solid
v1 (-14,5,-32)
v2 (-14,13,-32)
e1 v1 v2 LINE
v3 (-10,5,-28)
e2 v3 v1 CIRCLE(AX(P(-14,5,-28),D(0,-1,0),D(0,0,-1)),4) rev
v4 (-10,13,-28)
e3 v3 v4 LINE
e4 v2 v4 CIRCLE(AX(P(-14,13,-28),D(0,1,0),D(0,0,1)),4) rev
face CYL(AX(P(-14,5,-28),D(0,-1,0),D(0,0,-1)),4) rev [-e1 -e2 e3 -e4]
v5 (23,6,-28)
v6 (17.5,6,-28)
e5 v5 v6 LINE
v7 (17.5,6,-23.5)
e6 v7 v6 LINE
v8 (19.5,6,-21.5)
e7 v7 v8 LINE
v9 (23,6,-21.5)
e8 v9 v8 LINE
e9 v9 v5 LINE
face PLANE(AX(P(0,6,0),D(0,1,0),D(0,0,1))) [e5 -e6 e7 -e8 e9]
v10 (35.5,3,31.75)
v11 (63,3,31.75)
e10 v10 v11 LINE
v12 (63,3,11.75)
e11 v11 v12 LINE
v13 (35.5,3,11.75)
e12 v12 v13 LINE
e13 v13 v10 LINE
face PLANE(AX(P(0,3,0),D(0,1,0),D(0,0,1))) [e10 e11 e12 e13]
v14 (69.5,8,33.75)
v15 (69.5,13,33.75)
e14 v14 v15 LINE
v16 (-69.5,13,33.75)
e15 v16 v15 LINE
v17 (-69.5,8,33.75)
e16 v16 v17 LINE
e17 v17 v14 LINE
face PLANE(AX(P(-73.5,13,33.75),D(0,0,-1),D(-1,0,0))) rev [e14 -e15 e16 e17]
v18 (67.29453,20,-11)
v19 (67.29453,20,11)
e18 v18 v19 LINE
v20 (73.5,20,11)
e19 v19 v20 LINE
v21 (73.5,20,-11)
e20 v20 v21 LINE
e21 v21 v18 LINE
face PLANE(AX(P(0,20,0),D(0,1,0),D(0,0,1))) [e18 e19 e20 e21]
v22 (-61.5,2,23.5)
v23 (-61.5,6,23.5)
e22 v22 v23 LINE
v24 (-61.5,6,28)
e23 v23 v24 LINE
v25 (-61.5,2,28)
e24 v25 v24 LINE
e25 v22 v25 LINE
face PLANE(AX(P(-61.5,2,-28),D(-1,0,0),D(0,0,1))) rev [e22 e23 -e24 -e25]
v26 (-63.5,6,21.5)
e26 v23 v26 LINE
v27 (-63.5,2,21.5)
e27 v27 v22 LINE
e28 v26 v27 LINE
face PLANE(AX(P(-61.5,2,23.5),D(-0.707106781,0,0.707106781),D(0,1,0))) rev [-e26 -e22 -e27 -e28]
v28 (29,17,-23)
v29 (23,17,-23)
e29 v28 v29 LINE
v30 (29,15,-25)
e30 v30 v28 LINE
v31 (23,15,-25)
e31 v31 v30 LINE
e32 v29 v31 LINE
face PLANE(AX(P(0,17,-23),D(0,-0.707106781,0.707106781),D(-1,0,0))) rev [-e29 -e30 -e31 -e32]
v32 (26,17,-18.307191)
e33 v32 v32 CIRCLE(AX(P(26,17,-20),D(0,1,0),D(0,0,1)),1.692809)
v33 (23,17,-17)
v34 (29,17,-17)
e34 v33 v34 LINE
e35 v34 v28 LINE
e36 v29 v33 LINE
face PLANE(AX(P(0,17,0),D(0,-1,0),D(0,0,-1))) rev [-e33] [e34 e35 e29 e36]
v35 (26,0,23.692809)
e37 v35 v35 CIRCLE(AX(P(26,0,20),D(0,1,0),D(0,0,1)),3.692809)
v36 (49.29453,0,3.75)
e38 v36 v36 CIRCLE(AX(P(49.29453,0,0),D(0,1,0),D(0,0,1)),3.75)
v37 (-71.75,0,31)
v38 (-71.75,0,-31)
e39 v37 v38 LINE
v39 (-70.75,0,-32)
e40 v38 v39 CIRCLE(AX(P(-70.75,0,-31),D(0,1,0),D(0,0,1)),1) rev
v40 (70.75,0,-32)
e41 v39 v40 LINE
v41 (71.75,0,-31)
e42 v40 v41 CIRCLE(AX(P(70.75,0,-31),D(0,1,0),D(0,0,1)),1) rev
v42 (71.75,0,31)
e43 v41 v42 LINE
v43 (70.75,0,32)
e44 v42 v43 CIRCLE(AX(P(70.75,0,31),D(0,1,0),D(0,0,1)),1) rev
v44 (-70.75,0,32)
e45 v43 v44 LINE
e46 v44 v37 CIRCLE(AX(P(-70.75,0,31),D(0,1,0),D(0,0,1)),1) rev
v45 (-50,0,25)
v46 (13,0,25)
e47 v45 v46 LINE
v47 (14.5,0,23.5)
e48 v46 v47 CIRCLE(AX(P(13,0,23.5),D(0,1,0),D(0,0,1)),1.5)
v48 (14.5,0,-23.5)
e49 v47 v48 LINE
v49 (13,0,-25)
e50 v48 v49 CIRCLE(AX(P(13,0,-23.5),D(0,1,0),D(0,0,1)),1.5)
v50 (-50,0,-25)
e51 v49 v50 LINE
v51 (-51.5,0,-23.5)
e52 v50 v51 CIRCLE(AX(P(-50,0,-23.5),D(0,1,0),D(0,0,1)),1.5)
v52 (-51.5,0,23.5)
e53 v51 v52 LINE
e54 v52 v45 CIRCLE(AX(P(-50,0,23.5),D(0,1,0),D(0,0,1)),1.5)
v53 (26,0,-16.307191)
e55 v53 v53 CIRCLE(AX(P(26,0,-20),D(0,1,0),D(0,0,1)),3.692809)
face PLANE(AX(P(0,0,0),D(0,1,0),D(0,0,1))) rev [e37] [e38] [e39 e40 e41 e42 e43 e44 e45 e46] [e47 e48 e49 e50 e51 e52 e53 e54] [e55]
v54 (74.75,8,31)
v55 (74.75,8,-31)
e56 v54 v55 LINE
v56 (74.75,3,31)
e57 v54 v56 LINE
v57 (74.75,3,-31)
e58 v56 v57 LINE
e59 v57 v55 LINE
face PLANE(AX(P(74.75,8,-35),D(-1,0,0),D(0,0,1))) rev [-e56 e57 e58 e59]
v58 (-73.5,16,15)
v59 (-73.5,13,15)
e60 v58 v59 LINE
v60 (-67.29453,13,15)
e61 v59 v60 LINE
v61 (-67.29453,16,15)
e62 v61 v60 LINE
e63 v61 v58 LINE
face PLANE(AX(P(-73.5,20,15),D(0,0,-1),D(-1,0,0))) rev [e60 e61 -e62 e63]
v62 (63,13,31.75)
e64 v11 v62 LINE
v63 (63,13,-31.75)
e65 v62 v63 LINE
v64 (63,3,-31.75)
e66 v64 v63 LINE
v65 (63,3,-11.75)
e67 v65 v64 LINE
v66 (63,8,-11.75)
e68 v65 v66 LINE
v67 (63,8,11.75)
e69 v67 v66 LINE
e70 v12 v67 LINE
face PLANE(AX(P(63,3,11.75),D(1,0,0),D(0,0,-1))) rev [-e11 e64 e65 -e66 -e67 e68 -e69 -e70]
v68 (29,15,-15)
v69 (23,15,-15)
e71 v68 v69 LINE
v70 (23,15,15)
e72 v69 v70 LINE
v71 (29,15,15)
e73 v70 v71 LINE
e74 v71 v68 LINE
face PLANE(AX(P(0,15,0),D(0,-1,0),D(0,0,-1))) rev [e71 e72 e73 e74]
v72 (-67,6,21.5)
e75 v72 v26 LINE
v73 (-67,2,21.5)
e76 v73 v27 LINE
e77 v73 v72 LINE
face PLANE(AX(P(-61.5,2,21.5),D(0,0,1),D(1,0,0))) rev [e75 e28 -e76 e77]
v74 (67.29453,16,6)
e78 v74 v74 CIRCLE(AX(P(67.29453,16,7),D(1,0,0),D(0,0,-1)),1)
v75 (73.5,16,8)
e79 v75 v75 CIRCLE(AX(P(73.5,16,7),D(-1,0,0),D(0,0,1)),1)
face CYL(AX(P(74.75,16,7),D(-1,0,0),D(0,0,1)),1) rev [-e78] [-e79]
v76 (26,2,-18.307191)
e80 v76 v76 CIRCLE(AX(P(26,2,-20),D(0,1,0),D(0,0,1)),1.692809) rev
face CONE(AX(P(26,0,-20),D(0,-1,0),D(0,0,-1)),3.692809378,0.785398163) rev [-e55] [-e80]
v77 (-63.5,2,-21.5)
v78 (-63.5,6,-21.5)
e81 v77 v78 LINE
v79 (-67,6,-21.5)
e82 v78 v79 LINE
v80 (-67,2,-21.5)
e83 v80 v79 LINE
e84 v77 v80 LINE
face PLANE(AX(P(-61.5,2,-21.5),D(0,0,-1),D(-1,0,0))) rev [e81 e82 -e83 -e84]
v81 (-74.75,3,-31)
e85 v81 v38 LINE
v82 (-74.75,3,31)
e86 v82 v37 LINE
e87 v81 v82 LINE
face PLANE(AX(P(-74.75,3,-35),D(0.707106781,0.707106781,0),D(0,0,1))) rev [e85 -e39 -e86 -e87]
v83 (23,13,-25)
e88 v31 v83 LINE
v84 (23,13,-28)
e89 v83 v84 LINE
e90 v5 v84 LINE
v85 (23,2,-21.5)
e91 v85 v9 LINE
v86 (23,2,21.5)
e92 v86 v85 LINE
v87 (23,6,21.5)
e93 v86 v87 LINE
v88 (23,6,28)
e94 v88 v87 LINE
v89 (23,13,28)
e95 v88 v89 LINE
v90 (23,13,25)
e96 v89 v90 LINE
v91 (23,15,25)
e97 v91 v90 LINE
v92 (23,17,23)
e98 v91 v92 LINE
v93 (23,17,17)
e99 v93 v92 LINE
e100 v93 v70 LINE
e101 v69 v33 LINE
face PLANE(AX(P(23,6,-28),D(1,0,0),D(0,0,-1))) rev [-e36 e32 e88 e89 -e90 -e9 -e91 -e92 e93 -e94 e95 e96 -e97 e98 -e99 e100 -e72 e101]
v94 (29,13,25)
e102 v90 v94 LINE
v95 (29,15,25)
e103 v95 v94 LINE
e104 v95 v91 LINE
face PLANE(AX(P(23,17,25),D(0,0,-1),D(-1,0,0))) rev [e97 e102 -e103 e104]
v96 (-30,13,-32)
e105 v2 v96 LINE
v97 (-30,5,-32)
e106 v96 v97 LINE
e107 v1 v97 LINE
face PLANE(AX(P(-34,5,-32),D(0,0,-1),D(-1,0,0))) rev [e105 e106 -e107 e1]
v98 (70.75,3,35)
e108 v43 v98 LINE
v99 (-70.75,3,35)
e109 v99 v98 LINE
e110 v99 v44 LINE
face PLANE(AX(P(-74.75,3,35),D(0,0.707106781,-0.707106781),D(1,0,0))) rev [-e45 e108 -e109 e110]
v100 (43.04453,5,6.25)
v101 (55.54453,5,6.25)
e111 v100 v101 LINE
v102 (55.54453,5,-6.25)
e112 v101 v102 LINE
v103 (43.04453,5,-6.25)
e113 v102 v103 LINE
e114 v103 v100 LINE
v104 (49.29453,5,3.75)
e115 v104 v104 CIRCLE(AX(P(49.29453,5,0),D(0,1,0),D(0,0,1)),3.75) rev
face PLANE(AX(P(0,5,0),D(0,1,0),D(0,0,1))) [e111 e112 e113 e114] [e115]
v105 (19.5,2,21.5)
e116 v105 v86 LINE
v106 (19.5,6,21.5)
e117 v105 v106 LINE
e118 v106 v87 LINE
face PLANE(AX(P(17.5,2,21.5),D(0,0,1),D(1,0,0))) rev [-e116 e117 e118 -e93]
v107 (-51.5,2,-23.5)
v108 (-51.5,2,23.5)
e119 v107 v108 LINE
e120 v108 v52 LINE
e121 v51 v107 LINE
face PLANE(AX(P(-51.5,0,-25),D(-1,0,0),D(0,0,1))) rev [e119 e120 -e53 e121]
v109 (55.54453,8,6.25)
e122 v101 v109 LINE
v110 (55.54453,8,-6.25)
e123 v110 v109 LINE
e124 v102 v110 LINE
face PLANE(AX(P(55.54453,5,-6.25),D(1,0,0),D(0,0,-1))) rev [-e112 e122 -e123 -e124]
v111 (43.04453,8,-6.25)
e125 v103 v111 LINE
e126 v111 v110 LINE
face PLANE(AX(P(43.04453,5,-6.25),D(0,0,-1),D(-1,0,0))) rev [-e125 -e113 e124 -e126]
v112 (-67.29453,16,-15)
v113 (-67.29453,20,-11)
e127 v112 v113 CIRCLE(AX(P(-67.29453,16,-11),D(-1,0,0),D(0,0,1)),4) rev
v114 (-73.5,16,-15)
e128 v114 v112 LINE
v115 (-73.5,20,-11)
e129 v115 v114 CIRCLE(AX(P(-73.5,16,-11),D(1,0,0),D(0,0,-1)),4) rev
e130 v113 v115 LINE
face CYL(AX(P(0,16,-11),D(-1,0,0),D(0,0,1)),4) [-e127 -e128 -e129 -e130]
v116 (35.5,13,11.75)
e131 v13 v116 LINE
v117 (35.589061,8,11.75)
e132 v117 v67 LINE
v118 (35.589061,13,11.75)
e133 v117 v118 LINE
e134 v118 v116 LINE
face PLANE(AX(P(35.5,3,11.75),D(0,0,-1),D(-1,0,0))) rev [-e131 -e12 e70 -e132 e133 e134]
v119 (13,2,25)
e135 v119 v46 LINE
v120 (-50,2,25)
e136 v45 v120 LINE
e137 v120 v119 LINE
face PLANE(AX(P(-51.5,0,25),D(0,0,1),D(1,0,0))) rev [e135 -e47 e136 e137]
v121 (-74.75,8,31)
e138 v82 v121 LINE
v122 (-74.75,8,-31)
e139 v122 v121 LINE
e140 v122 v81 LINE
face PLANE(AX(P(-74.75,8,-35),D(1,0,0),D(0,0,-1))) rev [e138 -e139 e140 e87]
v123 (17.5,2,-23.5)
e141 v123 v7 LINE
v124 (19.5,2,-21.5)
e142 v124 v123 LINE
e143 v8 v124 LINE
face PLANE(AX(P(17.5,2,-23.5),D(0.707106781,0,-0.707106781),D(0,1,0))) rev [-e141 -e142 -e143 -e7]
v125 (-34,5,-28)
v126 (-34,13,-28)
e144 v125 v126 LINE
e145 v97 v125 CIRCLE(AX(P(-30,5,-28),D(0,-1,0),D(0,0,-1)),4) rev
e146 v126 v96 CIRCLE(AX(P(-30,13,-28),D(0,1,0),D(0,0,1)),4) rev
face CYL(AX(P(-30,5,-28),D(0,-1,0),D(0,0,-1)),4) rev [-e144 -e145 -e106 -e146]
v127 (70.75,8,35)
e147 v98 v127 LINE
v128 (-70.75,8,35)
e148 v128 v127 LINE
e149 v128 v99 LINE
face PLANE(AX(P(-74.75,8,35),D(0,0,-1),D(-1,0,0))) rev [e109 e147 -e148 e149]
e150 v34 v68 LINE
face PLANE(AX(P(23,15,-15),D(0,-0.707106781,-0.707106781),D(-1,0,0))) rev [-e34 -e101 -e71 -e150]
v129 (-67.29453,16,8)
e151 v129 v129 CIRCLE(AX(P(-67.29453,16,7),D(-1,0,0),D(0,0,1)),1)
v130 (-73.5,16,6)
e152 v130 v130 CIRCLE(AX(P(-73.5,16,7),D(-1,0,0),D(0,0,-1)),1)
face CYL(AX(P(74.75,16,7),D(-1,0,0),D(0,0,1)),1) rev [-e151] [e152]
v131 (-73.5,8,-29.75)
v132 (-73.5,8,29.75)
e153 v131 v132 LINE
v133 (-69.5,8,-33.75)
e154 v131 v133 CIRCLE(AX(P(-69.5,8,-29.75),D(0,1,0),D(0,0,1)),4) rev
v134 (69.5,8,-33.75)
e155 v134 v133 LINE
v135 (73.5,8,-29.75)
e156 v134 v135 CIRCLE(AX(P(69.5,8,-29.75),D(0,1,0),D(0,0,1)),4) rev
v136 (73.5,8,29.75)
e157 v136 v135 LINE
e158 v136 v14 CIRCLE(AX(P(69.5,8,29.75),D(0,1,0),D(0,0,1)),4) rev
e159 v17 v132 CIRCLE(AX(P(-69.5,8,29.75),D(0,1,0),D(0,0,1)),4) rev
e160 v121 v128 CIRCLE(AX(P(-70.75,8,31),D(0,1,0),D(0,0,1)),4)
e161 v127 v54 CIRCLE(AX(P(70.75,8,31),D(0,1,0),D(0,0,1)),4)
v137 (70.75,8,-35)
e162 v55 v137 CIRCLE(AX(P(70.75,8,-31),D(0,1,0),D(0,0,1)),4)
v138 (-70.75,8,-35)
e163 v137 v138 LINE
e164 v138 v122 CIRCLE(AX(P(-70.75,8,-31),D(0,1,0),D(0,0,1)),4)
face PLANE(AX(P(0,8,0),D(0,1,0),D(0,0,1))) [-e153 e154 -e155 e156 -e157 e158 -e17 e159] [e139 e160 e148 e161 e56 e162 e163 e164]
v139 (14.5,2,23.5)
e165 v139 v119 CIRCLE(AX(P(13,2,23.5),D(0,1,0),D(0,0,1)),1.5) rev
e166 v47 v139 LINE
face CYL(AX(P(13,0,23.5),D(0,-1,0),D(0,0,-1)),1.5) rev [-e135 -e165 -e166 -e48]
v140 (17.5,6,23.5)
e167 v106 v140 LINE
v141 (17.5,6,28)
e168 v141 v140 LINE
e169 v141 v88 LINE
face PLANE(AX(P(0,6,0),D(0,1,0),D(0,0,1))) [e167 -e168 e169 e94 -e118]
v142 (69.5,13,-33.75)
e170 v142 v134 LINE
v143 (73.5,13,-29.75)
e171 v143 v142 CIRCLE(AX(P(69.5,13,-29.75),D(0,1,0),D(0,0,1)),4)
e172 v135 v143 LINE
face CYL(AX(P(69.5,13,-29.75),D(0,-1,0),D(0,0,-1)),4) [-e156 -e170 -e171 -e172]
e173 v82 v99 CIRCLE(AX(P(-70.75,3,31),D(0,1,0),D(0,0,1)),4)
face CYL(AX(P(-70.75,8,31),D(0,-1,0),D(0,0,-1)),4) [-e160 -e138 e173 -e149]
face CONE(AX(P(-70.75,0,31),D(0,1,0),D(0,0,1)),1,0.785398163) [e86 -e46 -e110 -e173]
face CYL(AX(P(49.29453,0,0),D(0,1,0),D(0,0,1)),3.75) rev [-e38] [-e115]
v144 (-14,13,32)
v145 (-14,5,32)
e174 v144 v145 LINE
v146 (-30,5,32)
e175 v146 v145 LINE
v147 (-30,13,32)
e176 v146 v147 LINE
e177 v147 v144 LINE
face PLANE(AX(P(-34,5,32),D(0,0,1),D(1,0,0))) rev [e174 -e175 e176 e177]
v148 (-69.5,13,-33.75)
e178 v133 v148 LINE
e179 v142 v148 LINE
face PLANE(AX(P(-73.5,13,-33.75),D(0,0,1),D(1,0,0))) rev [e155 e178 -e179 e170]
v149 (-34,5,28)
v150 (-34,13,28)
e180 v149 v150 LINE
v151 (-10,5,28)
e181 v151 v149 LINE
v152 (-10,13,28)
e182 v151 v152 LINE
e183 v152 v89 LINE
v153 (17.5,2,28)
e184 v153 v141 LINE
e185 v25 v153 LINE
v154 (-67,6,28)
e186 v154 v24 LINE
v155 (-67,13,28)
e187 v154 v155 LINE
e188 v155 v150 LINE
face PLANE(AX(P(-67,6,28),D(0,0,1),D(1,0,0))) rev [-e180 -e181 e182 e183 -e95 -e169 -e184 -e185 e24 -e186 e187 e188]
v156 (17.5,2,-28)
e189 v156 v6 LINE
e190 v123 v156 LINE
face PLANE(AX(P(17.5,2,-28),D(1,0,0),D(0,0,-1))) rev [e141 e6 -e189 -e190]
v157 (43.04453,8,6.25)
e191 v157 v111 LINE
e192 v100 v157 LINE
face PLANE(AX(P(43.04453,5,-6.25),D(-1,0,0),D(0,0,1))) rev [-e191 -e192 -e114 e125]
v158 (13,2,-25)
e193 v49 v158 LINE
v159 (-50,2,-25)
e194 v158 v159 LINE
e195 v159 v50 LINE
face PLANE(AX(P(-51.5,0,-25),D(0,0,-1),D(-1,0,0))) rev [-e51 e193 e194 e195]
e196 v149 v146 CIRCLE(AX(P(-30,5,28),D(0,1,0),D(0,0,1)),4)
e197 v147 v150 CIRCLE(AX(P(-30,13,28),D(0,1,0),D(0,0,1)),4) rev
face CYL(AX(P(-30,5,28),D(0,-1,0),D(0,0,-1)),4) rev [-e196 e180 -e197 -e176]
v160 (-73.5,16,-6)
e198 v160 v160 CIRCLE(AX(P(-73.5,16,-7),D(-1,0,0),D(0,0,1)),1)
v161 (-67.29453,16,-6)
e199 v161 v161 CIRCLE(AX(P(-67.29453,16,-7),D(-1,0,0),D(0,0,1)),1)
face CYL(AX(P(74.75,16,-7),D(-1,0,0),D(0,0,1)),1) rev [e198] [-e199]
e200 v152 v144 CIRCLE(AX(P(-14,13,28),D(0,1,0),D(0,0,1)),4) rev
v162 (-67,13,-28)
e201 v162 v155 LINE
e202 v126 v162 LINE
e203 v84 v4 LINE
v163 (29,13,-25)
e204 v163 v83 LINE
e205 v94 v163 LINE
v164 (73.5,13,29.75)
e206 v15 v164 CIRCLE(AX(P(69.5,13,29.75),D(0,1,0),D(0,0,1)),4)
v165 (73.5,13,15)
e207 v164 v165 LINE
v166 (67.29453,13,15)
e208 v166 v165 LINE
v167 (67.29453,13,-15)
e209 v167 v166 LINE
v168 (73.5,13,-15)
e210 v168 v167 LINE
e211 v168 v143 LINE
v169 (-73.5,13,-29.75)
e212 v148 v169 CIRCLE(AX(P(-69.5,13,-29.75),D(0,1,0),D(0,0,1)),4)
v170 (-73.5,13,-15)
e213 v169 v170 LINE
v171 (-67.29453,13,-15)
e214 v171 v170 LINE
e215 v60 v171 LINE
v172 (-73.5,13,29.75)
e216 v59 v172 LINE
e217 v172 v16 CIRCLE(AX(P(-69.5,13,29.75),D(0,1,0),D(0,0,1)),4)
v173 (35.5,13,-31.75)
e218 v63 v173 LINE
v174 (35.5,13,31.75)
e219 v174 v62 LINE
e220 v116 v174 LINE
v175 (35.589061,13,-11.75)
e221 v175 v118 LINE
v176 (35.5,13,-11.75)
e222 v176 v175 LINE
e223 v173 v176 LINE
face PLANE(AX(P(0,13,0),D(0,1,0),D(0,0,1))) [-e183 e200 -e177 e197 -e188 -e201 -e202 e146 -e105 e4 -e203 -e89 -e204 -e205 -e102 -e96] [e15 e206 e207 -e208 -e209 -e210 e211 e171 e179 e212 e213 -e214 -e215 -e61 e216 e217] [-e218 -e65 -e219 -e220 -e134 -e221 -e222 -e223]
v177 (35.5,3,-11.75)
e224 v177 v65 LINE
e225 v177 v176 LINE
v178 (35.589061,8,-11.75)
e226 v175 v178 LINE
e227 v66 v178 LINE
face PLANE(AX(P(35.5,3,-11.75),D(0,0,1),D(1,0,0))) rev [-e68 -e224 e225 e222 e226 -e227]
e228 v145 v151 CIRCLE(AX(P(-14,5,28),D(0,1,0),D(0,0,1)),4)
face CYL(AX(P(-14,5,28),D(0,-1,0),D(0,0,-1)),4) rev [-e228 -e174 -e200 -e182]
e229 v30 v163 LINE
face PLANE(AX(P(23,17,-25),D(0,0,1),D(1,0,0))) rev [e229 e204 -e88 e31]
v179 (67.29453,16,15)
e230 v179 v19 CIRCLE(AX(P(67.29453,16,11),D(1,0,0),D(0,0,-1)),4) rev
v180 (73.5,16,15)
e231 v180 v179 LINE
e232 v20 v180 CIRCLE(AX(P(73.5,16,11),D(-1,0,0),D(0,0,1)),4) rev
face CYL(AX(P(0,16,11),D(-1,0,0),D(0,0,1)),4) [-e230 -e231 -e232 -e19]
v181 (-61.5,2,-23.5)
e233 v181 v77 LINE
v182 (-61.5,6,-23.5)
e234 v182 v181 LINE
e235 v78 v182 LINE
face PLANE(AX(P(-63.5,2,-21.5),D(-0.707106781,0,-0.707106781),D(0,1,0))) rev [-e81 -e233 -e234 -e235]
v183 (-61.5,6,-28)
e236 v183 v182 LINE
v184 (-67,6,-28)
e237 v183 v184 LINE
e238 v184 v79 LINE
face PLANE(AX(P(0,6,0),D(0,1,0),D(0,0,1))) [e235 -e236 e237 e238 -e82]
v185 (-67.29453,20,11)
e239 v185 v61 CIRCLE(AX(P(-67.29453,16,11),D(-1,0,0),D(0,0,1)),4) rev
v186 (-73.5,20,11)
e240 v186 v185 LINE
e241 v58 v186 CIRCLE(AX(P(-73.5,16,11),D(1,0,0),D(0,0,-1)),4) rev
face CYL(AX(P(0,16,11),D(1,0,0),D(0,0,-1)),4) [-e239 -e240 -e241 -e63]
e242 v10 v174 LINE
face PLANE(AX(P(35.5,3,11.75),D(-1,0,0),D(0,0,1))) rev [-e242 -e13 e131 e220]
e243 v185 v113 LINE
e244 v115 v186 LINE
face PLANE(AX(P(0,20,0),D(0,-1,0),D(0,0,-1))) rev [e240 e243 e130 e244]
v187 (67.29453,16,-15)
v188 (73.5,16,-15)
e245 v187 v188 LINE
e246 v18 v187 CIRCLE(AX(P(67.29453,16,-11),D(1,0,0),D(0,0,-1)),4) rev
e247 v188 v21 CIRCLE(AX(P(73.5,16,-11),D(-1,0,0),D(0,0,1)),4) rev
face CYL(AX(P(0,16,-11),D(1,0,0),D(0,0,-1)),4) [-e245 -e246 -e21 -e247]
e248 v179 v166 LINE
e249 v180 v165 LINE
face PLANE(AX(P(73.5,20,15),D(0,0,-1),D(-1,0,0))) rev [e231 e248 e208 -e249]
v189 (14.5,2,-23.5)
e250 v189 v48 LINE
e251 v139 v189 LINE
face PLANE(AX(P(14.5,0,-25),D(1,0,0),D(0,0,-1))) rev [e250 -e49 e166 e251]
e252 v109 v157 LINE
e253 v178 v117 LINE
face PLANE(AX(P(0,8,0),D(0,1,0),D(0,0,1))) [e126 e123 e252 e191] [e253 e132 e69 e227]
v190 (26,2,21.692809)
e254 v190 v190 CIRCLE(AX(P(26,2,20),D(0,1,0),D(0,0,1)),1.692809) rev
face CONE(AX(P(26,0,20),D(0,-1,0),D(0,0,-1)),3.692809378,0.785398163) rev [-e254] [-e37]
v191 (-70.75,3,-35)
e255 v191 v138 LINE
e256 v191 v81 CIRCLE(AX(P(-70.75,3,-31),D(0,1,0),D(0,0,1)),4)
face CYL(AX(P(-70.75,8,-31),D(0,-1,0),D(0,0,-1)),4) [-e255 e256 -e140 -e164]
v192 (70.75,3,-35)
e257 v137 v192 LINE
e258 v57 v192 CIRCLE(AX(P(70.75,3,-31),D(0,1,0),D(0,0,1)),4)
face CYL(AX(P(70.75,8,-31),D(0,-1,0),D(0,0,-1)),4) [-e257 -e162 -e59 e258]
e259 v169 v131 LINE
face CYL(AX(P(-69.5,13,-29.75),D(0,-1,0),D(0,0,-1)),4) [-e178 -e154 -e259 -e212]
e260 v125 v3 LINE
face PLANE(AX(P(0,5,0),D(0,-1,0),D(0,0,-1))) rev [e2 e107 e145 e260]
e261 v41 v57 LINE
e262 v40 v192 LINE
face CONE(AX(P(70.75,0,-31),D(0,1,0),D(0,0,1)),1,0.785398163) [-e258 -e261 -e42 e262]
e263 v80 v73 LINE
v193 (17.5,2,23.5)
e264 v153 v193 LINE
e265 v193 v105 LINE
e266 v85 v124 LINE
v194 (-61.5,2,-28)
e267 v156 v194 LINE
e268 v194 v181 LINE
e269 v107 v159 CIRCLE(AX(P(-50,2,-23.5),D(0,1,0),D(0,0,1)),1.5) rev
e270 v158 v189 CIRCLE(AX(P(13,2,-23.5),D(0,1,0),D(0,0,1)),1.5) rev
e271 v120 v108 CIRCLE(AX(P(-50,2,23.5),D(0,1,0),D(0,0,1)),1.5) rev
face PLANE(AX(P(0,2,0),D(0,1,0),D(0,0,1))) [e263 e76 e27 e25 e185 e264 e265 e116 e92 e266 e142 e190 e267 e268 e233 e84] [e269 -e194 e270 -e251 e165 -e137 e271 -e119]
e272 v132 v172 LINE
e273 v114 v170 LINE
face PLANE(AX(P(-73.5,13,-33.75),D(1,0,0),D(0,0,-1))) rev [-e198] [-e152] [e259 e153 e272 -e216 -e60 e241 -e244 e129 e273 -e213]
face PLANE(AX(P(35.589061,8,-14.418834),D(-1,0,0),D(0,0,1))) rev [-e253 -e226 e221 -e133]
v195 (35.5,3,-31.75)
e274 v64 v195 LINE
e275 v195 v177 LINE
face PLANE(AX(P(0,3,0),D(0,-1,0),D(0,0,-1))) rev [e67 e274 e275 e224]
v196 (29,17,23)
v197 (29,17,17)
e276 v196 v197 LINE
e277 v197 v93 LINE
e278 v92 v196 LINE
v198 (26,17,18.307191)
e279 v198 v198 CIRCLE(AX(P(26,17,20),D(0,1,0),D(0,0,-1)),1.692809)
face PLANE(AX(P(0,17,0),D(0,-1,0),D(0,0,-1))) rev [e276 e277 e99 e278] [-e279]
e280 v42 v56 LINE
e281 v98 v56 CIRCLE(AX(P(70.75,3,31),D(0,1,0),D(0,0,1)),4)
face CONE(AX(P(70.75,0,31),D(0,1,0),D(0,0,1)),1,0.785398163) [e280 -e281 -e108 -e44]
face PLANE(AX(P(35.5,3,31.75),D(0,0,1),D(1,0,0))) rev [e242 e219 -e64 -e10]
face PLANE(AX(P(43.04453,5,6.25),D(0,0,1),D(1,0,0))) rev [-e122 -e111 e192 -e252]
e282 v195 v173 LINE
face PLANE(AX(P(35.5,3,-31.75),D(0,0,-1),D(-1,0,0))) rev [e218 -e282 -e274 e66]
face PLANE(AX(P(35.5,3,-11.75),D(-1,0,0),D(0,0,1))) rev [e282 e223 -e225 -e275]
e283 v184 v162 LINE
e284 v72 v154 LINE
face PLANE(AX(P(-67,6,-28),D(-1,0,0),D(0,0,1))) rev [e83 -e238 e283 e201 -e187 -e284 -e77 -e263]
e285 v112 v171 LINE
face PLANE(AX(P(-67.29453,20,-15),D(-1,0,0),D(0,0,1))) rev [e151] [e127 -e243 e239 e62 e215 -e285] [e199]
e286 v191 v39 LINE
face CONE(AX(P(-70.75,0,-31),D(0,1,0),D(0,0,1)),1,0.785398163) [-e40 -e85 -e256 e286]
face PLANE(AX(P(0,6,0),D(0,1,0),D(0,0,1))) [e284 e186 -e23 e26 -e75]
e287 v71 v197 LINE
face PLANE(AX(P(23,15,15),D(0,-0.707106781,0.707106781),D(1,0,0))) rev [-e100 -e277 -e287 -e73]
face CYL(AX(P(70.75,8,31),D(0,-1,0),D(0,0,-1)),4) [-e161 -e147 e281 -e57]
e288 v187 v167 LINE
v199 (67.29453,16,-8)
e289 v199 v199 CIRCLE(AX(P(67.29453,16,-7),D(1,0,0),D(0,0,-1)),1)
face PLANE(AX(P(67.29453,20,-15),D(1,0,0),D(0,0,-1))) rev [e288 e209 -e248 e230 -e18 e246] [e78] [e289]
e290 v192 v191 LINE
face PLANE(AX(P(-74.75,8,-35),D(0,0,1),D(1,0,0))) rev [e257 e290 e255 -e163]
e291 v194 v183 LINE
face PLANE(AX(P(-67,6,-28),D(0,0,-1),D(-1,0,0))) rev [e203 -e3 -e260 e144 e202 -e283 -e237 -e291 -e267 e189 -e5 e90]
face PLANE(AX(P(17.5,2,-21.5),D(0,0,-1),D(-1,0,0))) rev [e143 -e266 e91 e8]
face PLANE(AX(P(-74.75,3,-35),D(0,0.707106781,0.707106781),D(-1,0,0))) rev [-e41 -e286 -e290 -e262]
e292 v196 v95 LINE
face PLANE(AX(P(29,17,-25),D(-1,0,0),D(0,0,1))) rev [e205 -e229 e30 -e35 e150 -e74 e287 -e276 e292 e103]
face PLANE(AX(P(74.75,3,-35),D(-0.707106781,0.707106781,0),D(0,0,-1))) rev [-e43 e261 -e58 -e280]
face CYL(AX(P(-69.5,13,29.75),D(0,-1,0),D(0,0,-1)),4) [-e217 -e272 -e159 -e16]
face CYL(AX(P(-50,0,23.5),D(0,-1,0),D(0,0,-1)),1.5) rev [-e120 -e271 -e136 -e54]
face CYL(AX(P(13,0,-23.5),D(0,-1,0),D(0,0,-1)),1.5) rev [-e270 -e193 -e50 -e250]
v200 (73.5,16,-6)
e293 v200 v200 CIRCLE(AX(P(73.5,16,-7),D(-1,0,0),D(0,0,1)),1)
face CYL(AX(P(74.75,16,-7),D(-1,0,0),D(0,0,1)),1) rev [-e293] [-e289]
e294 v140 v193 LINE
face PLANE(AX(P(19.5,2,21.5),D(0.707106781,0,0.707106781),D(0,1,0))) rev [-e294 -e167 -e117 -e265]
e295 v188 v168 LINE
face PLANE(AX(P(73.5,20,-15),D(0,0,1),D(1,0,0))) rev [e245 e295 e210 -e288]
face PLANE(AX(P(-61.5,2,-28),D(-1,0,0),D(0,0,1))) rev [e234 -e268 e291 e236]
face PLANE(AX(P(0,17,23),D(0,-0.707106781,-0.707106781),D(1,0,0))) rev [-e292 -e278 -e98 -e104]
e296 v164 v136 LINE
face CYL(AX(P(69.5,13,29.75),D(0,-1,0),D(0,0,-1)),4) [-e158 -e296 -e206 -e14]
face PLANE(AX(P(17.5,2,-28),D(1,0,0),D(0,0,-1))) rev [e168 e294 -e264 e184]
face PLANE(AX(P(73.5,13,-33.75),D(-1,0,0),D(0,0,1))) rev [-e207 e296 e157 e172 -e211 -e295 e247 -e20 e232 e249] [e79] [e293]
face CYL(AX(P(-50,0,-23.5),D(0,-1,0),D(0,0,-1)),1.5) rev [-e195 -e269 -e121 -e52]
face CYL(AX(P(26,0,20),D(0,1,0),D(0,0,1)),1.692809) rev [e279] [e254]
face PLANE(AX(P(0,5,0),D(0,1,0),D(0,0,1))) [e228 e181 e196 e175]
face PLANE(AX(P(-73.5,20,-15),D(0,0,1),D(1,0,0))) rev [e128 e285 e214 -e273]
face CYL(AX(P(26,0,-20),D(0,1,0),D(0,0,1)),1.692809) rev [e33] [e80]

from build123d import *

# Parameters (mm, degrees)
SKETCH1_W           = 149.5
SKETCH1_H           = 70
BOSS_EXTRUDE1_DEPTH = 8
FILLET1_R           = 4
SKETCH6_W           = 147
SKETCH6_H           = 67.5
BOSS_EXTRUDE3_DEPTH = 5
FILLET2_R           = 4
SKETCH7_W           = 6.205469591
SKETCH7_H           = 30
BOSS_EXTRUDE4_DEPTH = 7
SKETCH8_R           = 1
CUT_EXTRUDE3_DEPTH  = 154.632882223
FILLET5_R           = 4
SKETCH9_W           = 90
SKETCH9_H           = 56
CUT_EXTRUDE4_DEPTH  = 7
SKETCH10_W          = 79
SKETCH10_H          = 56
CUT_EXTRUDE5_DEPTH  = 4
SKETCH11_W          = 66
SKETCH11_H          = 50
CUT_EXTRUDE6_DEPTH  = 85.478177656
SKETCH13_W          = 6
SKETCH13_H          = 50
BOSS_EXTRUDE5_DEPTH = 4
SKETCH14_R          = 1.692809378
CUT_EXTRUDE7_DEPTH  = 85.270768953
SKETCH15_W          = 6
SKETCH15_H          = 30
CUT_EXTRUDE8_DEPTH  = 2
CHAMFER2_SIZE       = 2
SKETCH16_R          = 3.75
CUT_EXTRUDE9_DEPTH  = 84.555744865
SKETCH17_W          = 12.5
SKETCH17_H          = 12.5
CUT_EXTRUDE10_DEPTH = 8
SKETCH20_W          = 24
SKETCH20_H          = 4
CUT_EXTRUDE12_DEPTH = 8
FILLET6_R           = 4
CHAMFER3_SIZE       = 2
SKETCH23_W          = 5.5
SKETCH23_H          = 43
CUT_EXTRUDE15_DEPTH = 4
FILLET7_R           = 1.5
CHAMFER6_SIZE       = 2
SKETCH26_W          = 27.5
SKETCH26_H          = 20
CUT_EXTRUDE16_DEPTH = 10
SKETCH27_W          = 27.410939183
SKETCH27_H          = 28.83766823
CUT_EXTRUDE17_DEPTH = 5
CHAMFER7_SIZE       = 3


with BuildPart() as part:
    # Sketch1 → Boss-Extrude1 (new body)
    with BuildSketch(Plane(origin=(0, 0, 0), x_dir=(1, 0, 0), z_dir=(0, 1, 0))):
        Rectangle(SKETCH1_W, SKETCH1_H)
    extrude(amount=BOSS_EXTRUDE1_DEPTH)

    # Fillet1
    fillet1_edges = [part.edges().sort_by_distance(p)[0] for p in [
        (74.75, 4, 35),
        (-74.75, 4, 35),
        (-74.75, 4, -35),
        (74.75, 4, -35),
    ]]
    fillet(fillet1_edges, radius=FILLET1_R)

    # Sketch6 → Boss-Extrude3 (add)
    with BuildSketch(Plane(origin=(0, 8, 0), x_dir=(1, 0, 0), z_dir=(0, 1, 0))):
        Rectangle(SKETCH6_W, SKETCH6_H)
    extrude(amount=BOSS_EXTRUDE3_DEPTH)

    # Fillet2
    fillet2_edges = [part.edges().sort_by_distance(p)[0] for p in [
        (73.5, 10.5, 33.75),
        (73.5, 10.5, -33.75),
        (-73.5, 10.5, -33.75),
        (-73.5, 10.5, 33.75),
    ]]
    fillet(fillet2_edges, radius=FILLET2_R)

    # Sketch7 → Boss-Extrude4 (add)
    with BuildSketch(Plane(origin=(0, 13, 0), x_dir=(1, 0, 0), z_dir=(0, 1, 0))):
        with Locations((-70.397265205, 0)):
            Rectangle(SKETCH7_W, SKETCH7_H)
        with Locations((70.397265205, 0)):
            Rectangle(SKETCH7_W, SKETCH7_H)
    extrude(amount=BOSS_EXTRUDE4_DEPTH)

    # Sketch8 → Cut-Extrude3 (cut, through all)
    with BuildSketch(Plane.ZY.offset(73.5)):
        with Locations((-7, 16)):
            Circle(SKETCH8_R)
        with Locations((7, 16)):
            Circle(SKETCH8_R)
    extrude(amount=-CUT_EXTRUDE3_DEPTH, mode=Mode.SUBTRACT)

    # Fillet5
    fillet5_edges = [part.edges().sort_by_distance(p)[0] for p in [
        (-70.397265204, 20, 15),
        (-70.397265204, 20, -15),
        (70.397265204, 20, -15),
        (70.397265204, 20, 15),
    ]]
    fillet(fillet5_edges, radius=FILLET5_R)

    # Sketch9 → Cut-Extrude4 (cut)
    with BuildSketch(Plane(origin=(0, 13, 0), x_dir=(1, 0, 0), z_dir=(0, 1, 0))):
        with Locations((-22, 0)):
            Rectangle(SKETCH9_W, SKETCH9_H)
    extrude(amount=-CUT_EXTRUDE4_DEPTH, mode=Mode.SUBTRACT)

    # Sketch10 → Cut-Extrude5 (cut)
    with BuildSketch(Plane(origin=(0, 6, 0), x_dir=(1, 0, 0), z_dir=(0, 1, 0))):
        with Locations((-22, 0)):
            Rectangle(SKETCH10_W, SKETCH10_H)
    extrude(amount=-CUT_EXTRUDE5_DEPTH, mode=Mode.SUBTRACT)

    # Sketch11 → Cut-Extrude6 (cut, through all)
    with BuildSketch(Plane(origin=(0, 2, 0), x_dir=(1, 0, 0), z_dir=(0, 1, 0))):
        with Locations((-18.5, 0)):
            Rectangle(SKETCH11_W, SKETCH11_H)
    extrude(amount=-CUT_EXTRUDE6_DEPTH, mode=Mode.SUBTRACT)

    # Sketch13 → Boss-Extrude5 (add)
    with BuildSketch(Plane(origin=(0, 13, 0), x_dir=(1, 0, 0), z_dir=(0, 1, 0))):
        with Locations((26, 0)):
            Rectangle(SKETCH13_W, SKETCH13_H)
    extrude(amount=BOSS_EXTRUDE5_DEPTH)

    # Sketch14 → Cut-Extrude7 (cut, through all)
    with BuildSketch(Plane(origin=(0, 17, 0), x_dir=(1, 0, 0), z_dir=(0, 1, 0))):
        with Locations(Location((26, 20, 0), (0, 0, 270))):
            Circle(SKETCH14_R)
        with Locations(Location((26, -20, 0), (0, 0, 90))):
            Circle(SKETCH14_R)
    extrude(amount=-CUT_EXTRUDE7_DEPTH, mode=Mode.SUBTRACT)

    # Sketch15 → Cut-Extrude8 (cut)
    with BuildSketch(Plane(origin=(0, 17, 0), x_dir=(1, 0, 0), z_dir=(0, 1, 0))):
        with Locations((26, 0)):
            Rectangle(SKETCH15_W, SKETCH15_H)
    extrude(amount=-CUT_EXTRUDE8_DEPTH, mode=Mode.SUBTRACT)

    # Chamfer2
    chamfer2_edges = [part.edges().sort_by_distance(p)[0] for p in [
        (26, 0, -21.692809378),
        (26, 0, 21.692809378),
    ]]
    chamfer(chamfer2_edges, length=CHAMFER2_SIZE)

    # Sketch16 → Cut-Extrude9 (cut, through all)
    with BuildSketch(Plane(origin=(0, 13, 0), x_dir=(1, 0, 0), z_dir=(0, 1, 0))):
        with Locations(Location((49.294530409, 0, 0), (0, 0, 270))):
            Circle(SKETCH16_R)
    extrude(amount=-CUT_EXTRUDE9_DEPTH, mode=Mode.SUBTRACT)

    # Sketch17 → Cut-Extrude10 (cut)
    with BuildSketch(Plane(origin=(0, 13, 0), x_dir=(1, 0, 0), z_dir=(0, 1, 0))):
        with Locations((49.294530409, 0)):
            Rectangle(SKETCH17_W, SKETCH17_H)
    extrude(amount=-CUT_EXTRUDE10_DEPTH, mode=Mode.SUBTRACT)

    # Sketch20 → Cut-Extrude12 (cut)
    with BuildSketch(Plane(origin=(0, 13, 0), x_dir=(1, 0, 0), z_dir=(0, 1, 0))):
        with Locations((-22, 30)):
            Rectangle(SKETCH20_W, SKETCH20_H)
        with Locations((-22, -30)):
            Rectangle(SKETCH20_W, SKETCH20_H)
    extrude(amount=-CUT_EXTRUDE12_DEPTH, mode=Mode.SUBTRACT)

    # Fillet6
    fillet6_edges = [part.edges().sort_by_distance(p)[0] for p in [
        (-34, 9, 32),
        (-10, 9, 32),
        (-10, 9, -32),
        (-34, 9, -32),
    ]]
    fillet(fillet6_edges, radius=FILLET6_R - 0.0001)  # a hair under: the kernel refuses the full size

    # Chamfer3
    chamfer3_edges = [part.edges().sort_by_distance(p)[0] for p in [
        (26, 17, 15),
        (26, 17, -15),
        (26, 17, -25),
        (26, 17, 25),
    ]]
    chamfer(chamfer3_edges, length=CHAMFER3_SIZE - 0.0001)  # a hair under: the kernel refuses the full size

    # Sketch23 → Cut-Extrude15 (cut)
    with BuildSketch(Plane(origin=(0, 6, 0), x_dir=(1, 0, 0), z_dir=(0, 1, 0))):
        with Locations((-64.25, 0)):
            Rectangle(SKETCH23_W, SKETCH23_H)
        with Locations((20.25, 0)):
            Rectangle(SKETCH23_W, SKETCH23_H)
    extrude(amount=-CUT_EXTRUDE15_DEPTH, mode=Mode.SUBTRACT)

    # Fillet7
    fillet7_edges = [part.edges().sort_by_distance(p)[0] for p in [
        (14.5, 1, -25),
        (14.5, 1, 25),
        (-51.5, 1, 25),
        (-51.5, 1, -25),
    ]]
    fillet(fillet7_edges, radius=FILLET7_R)

    # Chamfer6
    chamfer6_edges = [part.edges().sort_by_distance(p)[0] for p in [
        (-61.5, 4, 21.5),
        (-61.5, 4, -21.5),
        (17.5, 4, 21.5),
        (17.5, 4, -21.5),
    ]]
    chamfer(chamfer6_edges, length=CHAMFER6_SIZE)

    # Sketch26 → Cut-Extrude16 (cut)
    with BuildSketch(Plane(origin=(0, 13, 0), x_dir=(1, 0, 0), z_dir=(0, 1, 0))):
        with Locations((49.25, -21.75)):
            Rectangle(SKETCH26_W, SKETCH26_H)
        with Locations((49.25, 21.75)):
            Rectangle(SKETCH26_W, SKETCH26_H)
    extrude(amount=-CUT_EXTRUDE16_DEPTH, mode=Mode.SUBTRACT)

    # Sketch27 → Cut-Extrude17 (cut)
    with BuildSketch(Plane(origin=(0, 13, 0), x_dir=(1, 0, 0), z_dir=(0, 1, 0))):
        with Locations((49.294530409, 0)):
            Rectangle(SKETCH27_W, SKETCH27_H)
    extrude(amount=-CUT_EXTRUDE17_DEPTH, mode=Mode.SUBTRACT)

    # Chamfer7
    chamfer7_edges = [part.edges().sort_by_distance(p)[0] for p in [
        (-74.75, 0, 0),
        (74.75, 0, 0),
        (0, 0, 35),
        (0, 0, -35),
        (73.578427125, 0, 33.828427125),
        (73.578427125, 0, -33.828427125),
        (-73.578427125, 0, 33.828427125),
        (-73.578427125, 0, -33.828427125),
    ]]
    chamfer(chamfer7_edges, length=CHAMFER7_SIZE)


solid = part.part
